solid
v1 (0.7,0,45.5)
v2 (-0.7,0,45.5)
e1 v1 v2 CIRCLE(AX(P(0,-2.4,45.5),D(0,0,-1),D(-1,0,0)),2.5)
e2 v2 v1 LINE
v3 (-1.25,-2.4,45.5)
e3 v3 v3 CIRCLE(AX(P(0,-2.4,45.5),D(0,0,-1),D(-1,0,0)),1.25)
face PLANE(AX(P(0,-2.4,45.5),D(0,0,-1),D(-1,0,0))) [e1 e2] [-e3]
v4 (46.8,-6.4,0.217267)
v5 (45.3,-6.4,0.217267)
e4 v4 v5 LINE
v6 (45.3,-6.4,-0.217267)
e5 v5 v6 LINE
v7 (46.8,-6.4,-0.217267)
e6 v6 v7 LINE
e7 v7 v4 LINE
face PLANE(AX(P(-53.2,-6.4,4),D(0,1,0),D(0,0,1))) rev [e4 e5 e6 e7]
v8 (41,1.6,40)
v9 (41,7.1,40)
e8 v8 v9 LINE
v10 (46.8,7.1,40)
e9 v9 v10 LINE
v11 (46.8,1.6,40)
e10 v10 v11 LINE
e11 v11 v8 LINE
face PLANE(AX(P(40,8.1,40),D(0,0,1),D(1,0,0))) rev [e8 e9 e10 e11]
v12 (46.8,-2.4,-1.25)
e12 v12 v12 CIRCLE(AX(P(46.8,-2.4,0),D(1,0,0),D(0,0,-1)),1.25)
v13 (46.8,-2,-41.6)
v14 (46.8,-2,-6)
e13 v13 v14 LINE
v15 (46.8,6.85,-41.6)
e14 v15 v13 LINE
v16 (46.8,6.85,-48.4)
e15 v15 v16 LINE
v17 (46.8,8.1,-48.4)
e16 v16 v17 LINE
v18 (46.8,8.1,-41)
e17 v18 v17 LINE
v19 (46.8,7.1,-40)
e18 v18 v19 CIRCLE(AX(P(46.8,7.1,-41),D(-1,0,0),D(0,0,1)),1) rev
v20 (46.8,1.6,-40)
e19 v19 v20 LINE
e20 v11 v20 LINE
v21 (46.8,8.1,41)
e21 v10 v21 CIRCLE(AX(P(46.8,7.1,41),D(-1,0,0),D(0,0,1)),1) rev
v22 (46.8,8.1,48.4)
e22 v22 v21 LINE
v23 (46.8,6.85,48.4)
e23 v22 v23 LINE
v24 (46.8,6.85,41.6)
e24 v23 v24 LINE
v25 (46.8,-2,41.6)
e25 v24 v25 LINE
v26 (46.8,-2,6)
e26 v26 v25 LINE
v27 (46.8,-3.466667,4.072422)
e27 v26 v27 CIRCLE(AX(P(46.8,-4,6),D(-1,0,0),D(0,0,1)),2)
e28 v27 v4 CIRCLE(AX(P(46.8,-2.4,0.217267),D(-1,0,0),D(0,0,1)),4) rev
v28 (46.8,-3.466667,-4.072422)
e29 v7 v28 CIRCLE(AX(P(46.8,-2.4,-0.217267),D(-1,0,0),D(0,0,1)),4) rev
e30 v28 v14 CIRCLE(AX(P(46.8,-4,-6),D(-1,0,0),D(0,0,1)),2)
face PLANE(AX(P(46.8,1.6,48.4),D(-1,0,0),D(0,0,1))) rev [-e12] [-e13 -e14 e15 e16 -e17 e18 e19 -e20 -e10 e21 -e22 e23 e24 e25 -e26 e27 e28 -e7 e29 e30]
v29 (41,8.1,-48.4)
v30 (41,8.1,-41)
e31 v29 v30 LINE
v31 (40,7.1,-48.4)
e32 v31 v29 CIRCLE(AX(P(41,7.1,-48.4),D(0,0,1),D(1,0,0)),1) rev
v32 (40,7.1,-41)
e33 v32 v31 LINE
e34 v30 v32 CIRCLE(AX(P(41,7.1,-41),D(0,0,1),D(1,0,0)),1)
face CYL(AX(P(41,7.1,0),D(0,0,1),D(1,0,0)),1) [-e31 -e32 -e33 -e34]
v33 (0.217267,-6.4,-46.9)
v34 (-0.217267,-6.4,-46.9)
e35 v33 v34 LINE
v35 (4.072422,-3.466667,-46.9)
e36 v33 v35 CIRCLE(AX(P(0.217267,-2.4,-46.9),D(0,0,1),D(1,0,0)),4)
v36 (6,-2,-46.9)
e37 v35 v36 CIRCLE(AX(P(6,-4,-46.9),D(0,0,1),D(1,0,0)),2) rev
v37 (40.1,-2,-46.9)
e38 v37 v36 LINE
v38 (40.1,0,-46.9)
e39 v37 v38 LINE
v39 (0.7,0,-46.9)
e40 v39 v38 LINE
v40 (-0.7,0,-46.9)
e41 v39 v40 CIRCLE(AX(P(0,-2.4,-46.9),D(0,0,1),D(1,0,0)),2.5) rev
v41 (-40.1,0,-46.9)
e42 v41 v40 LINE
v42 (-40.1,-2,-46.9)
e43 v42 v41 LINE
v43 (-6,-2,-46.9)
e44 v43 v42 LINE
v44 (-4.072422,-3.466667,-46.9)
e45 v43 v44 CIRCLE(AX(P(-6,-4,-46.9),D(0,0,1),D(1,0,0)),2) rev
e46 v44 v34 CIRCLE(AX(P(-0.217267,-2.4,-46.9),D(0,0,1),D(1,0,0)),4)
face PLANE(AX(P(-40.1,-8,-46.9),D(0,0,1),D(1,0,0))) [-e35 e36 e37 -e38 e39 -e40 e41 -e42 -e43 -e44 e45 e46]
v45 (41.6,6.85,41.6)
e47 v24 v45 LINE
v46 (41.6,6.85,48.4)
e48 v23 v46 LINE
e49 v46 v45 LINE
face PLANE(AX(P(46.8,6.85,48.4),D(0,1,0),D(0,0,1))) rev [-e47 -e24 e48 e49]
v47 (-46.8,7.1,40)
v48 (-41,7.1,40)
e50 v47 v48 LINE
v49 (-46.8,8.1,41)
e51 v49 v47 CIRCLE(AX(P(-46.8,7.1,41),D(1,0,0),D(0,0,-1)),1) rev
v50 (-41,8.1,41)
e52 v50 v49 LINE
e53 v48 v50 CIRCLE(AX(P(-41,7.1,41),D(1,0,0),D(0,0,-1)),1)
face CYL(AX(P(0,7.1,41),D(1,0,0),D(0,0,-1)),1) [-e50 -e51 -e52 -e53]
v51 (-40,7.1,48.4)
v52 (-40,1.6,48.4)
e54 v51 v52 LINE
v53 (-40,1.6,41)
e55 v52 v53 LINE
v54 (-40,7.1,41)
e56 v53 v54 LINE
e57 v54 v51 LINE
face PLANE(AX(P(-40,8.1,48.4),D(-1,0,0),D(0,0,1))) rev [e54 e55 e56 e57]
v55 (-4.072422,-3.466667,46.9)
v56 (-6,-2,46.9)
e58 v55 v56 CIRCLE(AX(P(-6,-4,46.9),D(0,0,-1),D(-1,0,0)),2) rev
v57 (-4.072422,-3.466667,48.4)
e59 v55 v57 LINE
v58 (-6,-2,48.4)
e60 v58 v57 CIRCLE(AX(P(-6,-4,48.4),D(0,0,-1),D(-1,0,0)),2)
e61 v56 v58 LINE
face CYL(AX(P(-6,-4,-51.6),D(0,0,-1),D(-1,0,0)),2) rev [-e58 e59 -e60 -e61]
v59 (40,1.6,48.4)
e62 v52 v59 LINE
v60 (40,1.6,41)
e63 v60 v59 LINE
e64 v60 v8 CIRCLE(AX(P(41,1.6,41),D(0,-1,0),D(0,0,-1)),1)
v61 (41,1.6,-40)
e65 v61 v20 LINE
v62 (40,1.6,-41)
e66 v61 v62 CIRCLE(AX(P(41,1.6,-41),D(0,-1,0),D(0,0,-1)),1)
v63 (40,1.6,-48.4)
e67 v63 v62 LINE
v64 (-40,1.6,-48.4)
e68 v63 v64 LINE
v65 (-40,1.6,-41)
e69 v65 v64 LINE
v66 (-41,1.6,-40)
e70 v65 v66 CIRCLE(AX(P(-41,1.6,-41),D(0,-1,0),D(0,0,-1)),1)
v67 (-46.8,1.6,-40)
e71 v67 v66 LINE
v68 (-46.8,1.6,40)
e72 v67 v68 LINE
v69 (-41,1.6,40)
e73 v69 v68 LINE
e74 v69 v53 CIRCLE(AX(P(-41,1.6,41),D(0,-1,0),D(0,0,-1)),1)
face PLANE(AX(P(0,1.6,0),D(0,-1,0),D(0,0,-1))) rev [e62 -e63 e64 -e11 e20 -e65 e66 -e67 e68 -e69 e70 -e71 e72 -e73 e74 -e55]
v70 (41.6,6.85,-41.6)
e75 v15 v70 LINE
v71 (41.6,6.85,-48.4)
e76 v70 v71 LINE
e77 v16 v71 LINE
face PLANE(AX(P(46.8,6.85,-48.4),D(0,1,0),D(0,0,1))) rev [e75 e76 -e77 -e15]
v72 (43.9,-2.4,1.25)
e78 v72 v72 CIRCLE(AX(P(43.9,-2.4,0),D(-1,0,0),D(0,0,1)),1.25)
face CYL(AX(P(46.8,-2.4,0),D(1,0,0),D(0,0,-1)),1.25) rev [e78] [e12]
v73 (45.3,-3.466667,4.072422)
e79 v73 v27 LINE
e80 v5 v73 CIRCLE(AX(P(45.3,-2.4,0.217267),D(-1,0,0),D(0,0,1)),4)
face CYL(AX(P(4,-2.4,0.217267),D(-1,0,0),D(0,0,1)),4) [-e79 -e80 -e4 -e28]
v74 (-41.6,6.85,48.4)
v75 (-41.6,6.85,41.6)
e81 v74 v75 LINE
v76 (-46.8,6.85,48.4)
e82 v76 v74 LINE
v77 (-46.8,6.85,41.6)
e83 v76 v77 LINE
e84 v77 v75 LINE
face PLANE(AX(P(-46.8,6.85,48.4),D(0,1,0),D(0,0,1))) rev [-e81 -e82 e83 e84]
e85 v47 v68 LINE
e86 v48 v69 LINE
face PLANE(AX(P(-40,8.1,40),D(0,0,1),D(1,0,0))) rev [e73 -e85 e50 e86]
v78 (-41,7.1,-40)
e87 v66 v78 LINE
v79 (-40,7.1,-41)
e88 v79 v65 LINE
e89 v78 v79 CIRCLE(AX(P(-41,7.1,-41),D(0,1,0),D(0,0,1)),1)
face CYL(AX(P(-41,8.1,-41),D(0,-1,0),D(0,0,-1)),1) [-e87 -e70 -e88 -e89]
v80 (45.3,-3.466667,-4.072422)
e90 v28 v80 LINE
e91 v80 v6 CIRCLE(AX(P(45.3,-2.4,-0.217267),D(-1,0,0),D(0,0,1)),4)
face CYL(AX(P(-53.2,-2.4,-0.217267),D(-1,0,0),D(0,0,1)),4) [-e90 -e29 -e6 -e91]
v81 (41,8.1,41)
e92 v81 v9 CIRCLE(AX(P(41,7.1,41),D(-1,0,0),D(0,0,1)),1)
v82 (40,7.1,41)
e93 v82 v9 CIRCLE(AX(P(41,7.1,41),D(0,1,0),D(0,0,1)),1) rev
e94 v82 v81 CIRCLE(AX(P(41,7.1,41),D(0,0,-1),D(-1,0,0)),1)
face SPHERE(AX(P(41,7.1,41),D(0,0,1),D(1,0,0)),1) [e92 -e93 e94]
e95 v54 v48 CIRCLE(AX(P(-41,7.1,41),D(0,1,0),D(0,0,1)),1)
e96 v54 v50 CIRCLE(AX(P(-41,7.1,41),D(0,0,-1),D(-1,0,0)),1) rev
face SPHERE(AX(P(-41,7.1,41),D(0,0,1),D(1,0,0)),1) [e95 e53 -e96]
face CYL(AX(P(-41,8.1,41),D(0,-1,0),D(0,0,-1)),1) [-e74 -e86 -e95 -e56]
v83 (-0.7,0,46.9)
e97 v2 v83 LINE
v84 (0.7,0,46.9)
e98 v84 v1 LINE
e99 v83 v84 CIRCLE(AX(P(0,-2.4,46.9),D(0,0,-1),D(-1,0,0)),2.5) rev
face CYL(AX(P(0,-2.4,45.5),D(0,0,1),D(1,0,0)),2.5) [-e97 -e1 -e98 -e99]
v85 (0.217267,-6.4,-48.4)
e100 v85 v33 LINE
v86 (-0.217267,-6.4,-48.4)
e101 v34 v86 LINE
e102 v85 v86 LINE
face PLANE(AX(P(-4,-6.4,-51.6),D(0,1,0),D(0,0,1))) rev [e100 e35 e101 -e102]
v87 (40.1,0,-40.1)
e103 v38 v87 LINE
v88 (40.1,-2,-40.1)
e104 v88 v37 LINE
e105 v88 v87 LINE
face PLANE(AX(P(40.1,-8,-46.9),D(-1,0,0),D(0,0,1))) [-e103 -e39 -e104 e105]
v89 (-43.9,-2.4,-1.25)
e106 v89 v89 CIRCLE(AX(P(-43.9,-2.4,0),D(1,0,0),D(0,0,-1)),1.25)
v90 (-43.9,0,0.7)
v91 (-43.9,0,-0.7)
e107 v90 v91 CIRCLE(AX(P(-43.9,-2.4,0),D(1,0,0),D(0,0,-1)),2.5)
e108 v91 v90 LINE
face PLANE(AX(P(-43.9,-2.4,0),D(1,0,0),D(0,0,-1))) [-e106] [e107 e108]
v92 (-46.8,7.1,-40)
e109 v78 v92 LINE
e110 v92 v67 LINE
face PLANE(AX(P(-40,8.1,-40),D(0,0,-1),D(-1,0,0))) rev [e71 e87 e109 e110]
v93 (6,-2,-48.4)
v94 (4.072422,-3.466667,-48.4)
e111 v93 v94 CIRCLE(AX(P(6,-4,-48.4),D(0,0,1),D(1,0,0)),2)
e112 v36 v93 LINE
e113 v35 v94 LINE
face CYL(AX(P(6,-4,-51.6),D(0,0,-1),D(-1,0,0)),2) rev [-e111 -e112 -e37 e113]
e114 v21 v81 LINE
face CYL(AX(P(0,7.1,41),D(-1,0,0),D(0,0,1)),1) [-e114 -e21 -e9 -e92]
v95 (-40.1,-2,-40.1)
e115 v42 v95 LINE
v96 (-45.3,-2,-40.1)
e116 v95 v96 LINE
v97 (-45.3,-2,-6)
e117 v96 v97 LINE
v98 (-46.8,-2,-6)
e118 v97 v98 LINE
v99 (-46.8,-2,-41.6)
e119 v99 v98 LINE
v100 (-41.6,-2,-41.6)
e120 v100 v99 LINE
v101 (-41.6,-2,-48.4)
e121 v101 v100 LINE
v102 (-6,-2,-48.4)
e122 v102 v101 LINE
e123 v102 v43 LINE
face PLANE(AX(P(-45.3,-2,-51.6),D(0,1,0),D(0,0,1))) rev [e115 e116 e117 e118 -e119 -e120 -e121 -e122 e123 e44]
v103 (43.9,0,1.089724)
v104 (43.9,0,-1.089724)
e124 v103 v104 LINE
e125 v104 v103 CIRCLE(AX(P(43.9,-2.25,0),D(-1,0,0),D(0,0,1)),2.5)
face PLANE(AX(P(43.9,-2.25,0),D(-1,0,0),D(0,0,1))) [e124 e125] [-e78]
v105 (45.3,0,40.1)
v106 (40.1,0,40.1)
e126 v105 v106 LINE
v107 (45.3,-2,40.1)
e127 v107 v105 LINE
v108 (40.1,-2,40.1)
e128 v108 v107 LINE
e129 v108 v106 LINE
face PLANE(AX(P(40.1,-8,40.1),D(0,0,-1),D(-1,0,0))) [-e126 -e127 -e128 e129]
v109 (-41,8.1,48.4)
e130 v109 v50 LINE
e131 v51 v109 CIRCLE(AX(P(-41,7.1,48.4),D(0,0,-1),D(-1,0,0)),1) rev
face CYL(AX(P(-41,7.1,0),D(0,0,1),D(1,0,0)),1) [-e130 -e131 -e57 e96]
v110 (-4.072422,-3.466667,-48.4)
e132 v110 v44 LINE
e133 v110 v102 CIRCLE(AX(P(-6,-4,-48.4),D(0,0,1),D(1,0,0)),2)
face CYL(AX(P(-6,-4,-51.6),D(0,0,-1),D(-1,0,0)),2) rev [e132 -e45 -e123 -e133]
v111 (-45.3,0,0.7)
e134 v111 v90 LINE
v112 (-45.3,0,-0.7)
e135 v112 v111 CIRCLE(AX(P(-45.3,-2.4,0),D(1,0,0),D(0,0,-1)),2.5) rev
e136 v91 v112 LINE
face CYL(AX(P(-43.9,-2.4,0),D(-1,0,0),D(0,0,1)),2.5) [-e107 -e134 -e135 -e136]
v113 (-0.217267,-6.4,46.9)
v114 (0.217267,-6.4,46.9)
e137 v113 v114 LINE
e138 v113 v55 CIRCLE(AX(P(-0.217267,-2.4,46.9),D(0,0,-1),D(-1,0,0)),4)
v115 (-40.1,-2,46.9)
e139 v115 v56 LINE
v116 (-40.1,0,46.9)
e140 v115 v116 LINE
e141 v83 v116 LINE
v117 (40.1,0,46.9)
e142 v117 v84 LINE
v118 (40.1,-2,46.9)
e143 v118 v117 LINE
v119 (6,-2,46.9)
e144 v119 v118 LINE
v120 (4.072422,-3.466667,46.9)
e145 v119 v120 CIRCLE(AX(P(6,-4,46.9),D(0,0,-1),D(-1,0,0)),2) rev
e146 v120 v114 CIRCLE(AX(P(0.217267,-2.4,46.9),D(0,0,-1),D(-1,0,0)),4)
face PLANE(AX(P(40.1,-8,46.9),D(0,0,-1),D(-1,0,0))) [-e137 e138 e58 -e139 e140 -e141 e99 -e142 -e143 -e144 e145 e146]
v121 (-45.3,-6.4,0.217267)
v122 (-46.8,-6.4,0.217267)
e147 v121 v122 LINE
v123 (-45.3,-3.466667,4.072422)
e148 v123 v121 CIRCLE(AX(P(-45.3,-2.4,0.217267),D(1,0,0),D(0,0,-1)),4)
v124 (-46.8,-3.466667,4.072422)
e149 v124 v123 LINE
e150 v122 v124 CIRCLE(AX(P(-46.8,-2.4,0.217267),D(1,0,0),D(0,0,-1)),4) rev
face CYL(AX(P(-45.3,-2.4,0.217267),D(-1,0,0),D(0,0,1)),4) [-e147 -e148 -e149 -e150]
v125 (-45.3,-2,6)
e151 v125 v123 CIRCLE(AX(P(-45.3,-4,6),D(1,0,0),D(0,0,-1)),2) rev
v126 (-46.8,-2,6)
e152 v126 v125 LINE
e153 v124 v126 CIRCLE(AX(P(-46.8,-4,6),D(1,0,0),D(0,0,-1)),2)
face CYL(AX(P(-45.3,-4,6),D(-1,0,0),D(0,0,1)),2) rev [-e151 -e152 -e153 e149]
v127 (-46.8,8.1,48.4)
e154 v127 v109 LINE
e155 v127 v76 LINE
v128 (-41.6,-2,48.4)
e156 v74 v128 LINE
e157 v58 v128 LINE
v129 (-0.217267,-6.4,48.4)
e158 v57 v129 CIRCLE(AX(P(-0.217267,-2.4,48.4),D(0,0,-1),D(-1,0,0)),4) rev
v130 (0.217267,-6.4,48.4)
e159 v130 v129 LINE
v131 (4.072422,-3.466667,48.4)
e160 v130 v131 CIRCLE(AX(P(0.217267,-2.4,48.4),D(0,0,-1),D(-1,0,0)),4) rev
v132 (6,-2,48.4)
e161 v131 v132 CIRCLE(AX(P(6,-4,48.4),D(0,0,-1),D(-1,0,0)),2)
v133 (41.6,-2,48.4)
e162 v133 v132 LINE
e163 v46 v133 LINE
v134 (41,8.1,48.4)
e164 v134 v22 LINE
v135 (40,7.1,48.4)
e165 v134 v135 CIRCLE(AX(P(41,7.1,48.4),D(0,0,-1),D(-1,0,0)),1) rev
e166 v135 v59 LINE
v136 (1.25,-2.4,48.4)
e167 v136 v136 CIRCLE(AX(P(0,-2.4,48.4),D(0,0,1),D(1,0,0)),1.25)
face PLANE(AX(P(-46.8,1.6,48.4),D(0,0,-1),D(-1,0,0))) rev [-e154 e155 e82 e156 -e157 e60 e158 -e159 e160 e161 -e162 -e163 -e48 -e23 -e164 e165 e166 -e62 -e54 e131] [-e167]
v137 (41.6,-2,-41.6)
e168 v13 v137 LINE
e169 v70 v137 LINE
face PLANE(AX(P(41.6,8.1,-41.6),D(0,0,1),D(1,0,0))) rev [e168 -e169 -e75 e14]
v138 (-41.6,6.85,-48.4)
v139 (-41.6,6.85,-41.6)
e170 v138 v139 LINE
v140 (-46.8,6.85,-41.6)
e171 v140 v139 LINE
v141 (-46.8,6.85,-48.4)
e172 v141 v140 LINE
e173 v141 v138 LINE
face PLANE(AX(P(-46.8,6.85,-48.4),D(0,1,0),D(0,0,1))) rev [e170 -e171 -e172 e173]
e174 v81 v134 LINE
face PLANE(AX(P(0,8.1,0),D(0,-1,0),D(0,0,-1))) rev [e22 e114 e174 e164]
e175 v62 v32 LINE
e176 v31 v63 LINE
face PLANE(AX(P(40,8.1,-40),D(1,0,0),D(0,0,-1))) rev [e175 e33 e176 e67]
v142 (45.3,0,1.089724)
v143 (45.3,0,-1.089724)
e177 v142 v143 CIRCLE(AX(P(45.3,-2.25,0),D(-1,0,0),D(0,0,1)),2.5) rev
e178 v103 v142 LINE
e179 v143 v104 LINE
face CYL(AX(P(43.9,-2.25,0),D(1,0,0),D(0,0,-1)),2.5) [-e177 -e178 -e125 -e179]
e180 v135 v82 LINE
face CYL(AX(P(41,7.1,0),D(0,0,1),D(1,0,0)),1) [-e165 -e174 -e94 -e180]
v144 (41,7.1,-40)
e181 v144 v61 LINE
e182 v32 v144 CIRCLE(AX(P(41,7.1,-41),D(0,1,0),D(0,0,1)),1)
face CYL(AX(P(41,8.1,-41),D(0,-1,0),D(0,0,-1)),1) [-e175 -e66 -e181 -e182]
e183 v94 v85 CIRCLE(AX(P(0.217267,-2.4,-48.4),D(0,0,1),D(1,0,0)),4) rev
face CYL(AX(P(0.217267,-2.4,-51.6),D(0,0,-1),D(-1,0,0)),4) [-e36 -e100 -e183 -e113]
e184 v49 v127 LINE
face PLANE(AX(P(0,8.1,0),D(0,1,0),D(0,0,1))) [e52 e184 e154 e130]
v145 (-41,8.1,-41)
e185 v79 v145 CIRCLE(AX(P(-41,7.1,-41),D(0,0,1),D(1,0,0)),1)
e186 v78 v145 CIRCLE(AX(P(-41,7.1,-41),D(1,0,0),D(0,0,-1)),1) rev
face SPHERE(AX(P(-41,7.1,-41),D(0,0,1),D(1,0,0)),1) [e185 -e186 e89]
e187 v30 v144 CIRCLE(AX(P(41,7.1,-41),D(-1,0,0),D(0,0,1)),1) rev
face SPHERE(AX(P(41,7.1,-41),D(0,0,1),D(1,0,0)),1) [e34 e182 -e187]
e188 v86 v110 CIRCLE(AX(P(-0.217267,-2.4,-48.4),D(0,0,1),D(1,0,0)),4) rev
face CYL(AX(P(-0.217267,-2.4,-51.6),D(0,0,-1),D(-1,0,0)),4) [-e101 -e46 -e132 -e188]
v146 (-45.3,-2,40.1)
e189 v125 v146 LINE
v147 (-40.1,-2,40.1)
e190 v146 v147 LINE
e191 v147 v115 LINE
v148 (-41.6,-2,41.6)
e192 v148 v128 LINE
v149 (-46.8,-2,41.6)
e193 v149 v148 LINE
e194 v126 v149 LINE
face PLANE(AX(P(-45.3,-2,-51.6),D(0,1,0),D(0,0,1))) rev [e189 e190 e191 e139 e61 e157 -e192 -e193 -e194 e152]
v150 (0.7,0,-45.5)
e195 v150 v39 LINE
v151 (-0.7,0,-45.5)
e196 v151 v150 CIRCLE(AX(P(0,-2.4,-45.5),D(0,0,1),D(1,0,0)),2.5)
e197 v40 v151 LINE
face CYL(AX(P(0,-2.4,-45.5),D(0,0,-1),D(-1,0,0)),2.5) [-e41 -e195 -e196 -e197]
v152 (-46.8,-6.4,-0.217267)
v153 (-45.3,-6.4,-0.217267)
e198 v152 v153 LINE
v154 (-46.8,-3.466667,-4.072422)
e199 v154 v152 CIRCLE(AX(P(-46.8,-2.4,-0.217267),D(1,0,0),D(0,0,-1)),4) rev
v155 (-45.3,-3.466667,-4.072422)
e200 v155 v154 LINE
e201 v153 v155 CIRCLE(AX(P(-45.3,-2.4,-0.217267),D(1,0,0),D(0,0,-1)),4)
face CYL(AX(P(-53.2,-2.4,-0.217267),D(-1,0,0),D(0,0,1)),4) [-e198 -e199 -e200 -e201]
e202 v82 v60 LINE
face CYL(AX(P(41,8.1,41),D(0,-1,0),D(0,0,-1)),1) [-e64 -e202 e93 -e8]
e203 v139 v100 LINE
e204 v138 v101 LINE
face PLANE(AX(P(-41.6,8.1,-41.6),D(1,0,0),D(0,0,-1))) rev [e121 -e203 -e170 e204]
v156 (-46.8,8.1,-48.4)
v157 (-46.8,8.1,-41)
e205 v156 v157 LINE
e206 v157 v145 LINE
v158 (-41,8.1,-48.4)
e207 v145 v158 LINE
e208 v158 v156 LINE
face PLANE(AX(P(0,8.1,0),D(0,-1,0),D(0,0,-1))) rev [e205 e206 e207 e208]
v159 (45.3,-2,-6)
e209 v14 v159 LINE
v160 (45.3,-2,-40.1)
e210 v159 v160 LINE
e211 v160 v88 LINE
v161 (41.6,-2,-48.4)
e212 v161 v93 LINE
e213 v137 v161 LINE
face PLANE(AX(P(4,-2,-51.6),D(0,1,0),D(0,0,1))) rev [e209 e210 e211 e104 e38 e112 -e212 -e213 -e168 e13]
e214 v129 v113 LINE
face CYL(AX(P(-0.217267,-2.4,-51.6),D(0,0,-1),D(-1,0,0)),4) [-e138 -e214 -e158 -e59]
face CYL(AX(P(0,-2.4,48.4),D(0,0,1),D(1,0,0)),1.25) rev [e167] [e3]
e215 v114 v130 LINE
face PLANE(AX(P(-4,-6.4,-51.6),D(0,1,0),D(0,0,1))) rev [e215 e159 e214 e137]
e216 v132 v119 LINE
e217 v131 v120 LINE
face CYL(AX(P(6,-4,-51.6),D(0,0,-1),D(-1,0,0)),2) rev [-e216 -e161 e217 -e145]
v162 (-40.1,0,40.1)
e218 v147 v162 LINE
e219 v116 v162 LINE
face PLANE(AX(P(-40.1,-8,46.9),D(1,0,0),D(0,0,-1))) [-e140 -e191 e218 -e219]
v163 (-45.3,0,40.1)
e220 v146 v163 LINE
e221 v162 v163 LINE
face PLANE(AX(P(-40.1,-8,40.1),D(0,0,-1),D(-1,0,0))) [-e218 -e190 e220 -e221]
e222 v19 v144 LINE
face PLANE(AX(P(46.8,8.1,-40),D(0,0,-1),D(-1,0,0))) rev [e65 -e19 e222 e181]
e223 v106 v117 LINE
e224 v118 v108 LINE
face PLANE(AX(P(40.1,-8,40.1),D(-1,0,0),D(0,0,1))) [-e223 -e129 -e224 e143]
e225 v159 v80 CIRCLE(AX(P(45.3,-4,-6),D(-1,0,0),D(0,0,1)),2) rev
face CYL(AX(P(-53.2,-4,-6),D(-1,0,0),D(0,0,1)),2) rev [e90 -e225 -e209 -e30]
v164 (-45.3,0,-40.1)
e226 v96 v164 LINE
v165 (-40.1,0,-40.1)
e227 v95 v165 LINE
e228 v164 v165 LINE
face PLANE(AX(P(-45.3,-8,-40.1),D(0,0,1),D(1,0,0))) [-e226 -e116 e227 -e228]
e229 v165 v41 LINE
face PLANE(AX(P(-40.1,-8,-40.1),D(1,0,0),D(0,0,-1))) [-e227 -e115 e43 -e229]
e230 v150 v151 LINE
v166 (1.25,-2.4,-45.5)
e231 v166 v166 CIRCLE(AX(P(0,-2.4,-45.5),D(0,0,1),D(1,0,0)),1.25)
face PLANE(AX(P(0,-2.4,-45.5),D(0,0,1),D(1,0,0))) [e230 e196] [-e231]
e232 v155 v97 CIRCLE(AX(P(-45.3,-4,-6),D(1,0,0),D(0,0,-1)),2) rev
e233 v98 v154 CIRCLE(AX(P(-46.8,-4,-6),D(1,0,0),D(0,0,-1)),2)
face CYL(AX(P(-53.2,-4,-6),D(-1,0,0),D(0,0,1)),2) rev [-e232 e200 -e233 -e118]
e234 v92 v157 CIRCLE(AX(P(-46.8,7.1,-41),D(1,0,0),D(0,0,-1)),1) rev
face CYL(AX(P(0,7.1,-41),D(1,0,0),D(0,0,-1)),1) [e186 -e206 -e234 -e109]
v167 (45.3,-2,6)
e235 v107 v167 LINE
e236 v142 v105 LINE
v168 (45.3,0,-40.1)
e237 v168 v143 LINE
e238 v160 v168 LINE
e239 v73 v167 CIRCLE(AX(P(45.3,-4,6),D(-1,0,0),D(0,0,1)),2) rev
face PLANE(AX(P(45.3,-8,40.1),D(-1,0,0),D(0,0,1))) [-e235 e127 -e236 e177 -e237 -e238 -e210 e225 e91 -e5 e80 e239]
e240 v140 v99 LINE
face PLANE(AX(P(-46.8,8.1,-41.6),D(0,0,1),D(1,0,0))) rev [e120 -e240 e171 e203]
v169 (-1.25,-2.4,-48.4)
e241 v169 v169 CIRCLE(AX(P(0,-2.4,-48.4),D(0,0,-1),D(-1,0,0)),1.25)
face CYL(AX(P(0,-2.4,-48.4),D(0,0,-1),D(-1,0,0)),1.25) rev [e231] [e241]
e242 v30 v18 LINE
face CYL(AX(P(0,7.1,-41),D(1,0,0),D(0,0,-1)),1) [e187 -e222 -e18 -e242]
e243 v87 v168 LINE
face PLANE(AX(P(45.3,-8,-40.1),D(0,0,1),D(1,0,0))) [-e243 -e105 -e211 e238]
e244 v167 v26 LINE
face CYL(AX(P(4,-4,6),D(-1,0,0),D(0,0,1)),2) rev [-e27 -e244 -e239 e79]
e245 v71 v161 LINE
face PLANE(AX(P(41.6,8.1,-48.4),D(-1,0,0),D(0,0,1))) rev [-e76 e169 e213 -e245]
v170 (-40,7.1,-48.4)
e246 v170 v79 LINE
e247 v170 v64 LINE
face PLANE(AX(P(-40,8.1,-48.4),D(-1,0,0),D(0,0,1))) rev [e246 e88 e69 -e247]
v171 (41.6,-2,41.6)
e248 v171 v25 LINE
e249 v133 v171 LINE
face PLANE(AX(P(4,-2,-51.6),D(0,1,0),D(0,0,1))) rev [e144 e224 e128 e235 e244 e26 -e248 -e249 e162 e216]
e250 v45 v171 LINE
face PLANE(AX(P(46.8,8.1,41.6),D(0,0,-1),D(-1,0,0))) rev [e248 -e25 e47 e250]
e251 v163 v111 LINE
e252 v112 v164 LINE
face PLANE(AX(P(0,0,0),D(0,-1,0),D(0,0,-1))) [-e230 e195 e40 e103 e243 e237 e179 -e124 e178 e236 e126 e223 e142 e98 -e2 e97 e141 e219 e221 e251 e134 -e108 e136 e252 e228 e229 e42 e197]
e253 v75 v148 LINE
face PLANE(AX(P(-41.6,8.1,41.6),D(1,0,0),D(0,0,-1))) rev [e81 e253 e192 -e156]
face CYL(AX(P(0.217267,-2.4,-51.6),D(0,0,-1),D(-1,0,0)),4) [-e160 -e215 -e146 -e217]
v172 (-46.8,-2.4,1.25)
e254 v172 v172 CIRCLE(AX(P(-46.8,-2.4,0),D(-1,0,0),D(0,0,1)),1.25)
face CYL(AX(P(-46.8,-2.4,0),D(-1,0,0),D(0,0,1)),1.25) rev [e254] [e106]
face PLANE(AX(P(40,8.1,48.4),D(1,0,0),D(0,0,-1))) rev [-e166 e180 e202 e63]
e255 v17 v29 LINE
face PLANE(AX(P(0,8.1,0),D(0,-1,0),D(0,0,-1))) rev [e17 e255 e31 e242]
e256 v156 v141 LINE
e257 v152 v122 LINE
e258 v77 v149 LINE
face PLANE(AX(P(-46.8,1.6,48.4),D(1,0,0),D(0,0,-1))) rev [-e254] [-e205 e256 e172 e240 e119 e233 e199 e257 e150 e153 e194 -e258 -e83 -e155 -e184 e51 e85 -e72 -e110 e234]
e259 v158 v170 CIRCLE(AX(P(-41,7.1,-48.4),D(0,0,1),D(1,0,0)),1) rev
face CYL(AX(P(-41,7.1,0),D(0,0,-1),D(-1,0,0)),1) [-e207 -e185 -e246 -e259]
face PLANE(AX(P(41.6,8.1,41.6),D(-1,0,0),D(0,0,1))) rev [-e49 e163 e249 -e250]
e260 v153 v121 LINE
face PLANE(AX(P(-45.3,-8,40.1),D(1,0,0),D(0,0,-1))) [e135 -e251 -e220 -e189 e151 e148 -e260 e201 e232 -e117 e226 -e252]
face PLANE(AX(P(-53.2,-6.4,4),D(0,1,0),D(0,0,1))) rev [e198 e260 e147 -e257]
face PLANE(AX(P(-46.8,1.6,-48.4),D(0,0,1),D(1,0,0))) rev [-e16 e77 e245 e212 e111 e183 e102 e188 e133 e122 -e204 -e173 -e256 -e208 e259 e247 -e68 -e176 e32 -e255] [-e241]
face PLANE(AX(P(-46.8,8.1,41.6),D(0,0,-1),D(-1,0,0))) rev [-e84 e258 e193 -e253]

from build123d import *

# Parameters (mm, degrees)
SKETCH2_W                 = 93.6
SKETCH2_H                 = 96.8
BOSS_EXTRUDE2_DEPTH       = 1.6
CUT_EXTRUDE1_DEPTH        = 1.6
CUT_EXTRUDE2_DEPTH        = 1.6
CUT_EXTRUDE3_DEPTH        = 1.6
CUT_EXTRUDE4_DEPTH        = 1.6
SKETCH7_R                 = 15
BOSS_EXTRUDE3_DEPTH       = 1.6
SKETCH8_R                 = 6
CUT_EXTRUDE5_DEPTH        = 1.6
FILLET1_R                 = 2
FILLET2_R                 = 2
SKETCH17_W                = 43.6
SKETCH17_H                = 1.6
BOSS_EXTRUDE4_DEPTH       = 8
CUT_EXTRUDE14_DEPTH       = 1.6
CUT_EXTRUDE15_DEPTH       = 1.6
SKETCH21_W                = 1.6
SKETCH21_H                = 43.6
BOSS_EXTRUDE5_DEPTH       = 8
SKETCH22_W                = 1.6
SKETCH22_H                = 43.6
BOSS_EXTRUDE6_DEPTH       = 8
SKETCH23_W                = 43.6
SKETCH23_H                = 1.6
BOSS_EXTRUDE7_DEPTH       = 8
CUT_EXTRUDE16_DEPTH       = 100
CUT_EXTRUDE17_DEPTH       = 100
CUT_EXTRUDE18_DEPTH       = 100
CUT_EXTRUDE19_DEPTH       = 100
SKETCH28_R                = 2.5
BOSS_EXTRUDE8_DEPTH       = 1.4
BOSS_EXTRUDE9_START       = 1.4
SKETCH29_R                = 2.5
BOSS_EXTRUDE9_DEPTH       = 1.4
SKETCH30_R                = 2.5
BOSS_EXTRUDE10_DEPTH      = 1.4
BOSS_EXTRUDE11_START      = 1.4
SKETCH31_R                = 2.5
BOSS_EXTRUDE11_DEPTH      = 1.4
M3X0_5_TAPPED_HOLE1_D     = 2.5
M3X0_5_TAPPED_HOLE2_D     = 2.5
M3X0_5_TAPPED_HOLE2_DEPTH = 8.5
M3X0_5_TAPPED_HOLE2_TIP   = 0.751075774
M3X0_5_TAPPED_HOLE3_D     = 2.5
M3X0_5_TAPPED_HOLE3_DEPTH = 8.5
M3X0_5_TAPPED_HOLE3_TIP   = 0.751075774
FILLET5_R                 = 5
FILLET6_R                 = 5
FILLET7_R                 = 5
SKETCH39_W                = 50
SKETCH39_H                = 2
CUT_EXTRUDE20_DEPTH       = 100
SKETCH40_W                = 50
SKETCH40_H                = 2
CUT_EXTRUDE21_DEPTH       = 100
FILLET10_R                = 5
FILLET11_R                = 5
BOSS_EXTRUDE12_DEPTH      = 6.5
FILLET12_R                = 1
BOSS_EXTRUDE13_DEPTH      = 6.5
FILLET13_R                = 1
BOSS_EXTRUDE14_DEPTH      = 6.5
BOSS_EXTRUDE15_DEPTH      = 6.5
FILLET14_R                = 1
SKETCH46_W                = 10
SKETCH46_H                = 6
CUT_EXTRUDE23_DEPTH       = 100
SKETCH47_W                = 10
SKETCH47_H                = 6
CUT_EXTRUDE24_DEPTH       = 100
SKETCH48_W                = 10
SKETCH48_H                = 6
CUT_EXTRUDE25_DEPTH       = 100
SKETCH49_W                = 10
SKETCH49_H                = 6
CUT_EXTRUDE26_DEPTH       = 100
CHAMFER1_SIZE             = 5
FILLET15_R                = 5
FILLET16_R                = 5
FILLET17_R                = 5
SKETCH51_W                = 6.8
SKETCH51_H                = 1.25
BOSS_EXTRUDE16_DEPTH      = 5.2
SKETCH52_W                = 6.8
SKETCH52_H                = 1.25
BOSS_EXTRUDE17_DEPTH      = 5.2
SKETCH53_W                = 5.2
SKETCH53_H                = 1.25
BOSS_EXTRUDE18_DEPTH      = 6.8
SKETCH54_W                = 6.8
SKETCH54_H                = 1.25
BOSS_EXTRUDE19_DEPTH      = 5.2
SKETCH55_W                = 5.452266971
SKETCH55_H                = 7.312215573
CUT_EXTRUDE27_DEPTH       = 1.6
SKETCH56_W                = 7.42696381
SKETCH56_H                = 8.768462259
CUT_EXTRUDE28_DEPTH       = 1.6
SKETCH57_W                = 6.622712937
SKETCH57_H                = 11.132324922
CUT_EXTRUDE29_DEPTH       = 1.6
SKETCH58_W                = 8.920588643
SKETCH58_H                = 11.870937258
CUT_EXTRUDE30_DEPTH       = 1.6
SKETCH60_W                = 93.6
SKETCH60_H                = 6
CUT_EXTRUDE31_DEPTH       = 100
BOSS_EXTRUDE20_DEPTH      = 8
SKETCH64_W                = 41.3
SKETCH64_H                = 6
CUT_EXTRUDE32_DEPTH       = 100
SKETCH65_W                = 41.3
SKETCH65_H                = 6
CUT_EXTRUDE33_DEPTH       = 100
SKETCH66_W                = 37.6
SKETCH66_H                = 6
CUT_EXTRUDE34_DEPTH       = 100
SKETCH68_W                = 37.6
SKETCH68_H                = 6
CUT_EXTRUDE35_DEPTH       = 100
FILLET19_R                = 2
SKETCH73_R                = 2.5
BOSS_EXTRUDE21_DEPTH      = 1.4
SKETCH74_R                = 2.5
BOSS_EXTRUDE22_DEPTH      = 1.4
BOSS_EXTRUDE23_START      = 1.4
SKETCH75_R                = 2.5
BOSS_EXTRUDE23_DEPTH      = 1.4
SKETCH76_R                = 2.5
BOSS_EXTRUDE24_DEPTH      = 1.4
SKETCH77_W                = 8
SKETCH77_H                = 1.6
CUT_EXTRUDE40_DEPTH       = 100
SKETCH79_W                = 8
SKETCH79_H                = 1.6
CUT_EXTRUDE41_DEPTH       = 100
FILLET20_R                = 4
M3X0_5_TAPPED_HOLE4_D     = 2.5
M3X0_5_TAPPED_HOLE4_DEPTH = 8.5
M3X0_5_TAPPED_HOLE4_TIP   = 0.751075774
M3X0_5_TAPPED_HOLE5_D     = 2.5
M3X0_5_TAPPED_HOLE5_DEPTH = 8.5
M3X0_5_TAPPED_HOLE5_TIP   = 0.751075774
M3X0_5_TAPPED_HOLE6_D     = 2.5
M3X0_5_TAPPED_HOLE6_DEPTH = 8.5
M3X0_5_TAPPED_HOLE6_TIP   = 0.751075774
M3X0_5_TAPPED_HOLE7_D     = 2.5
M3X0_5_TAPPED_HOLE7_DEPTH = 8.5
M3X0_5_TAPPED_HOLE7_TIP   = 0.751075774
SKETCH88_W                = 75.688433258
SKETCH88_H                = 79.83223405
BOSS_EXTRUDE25_DEPTH      = 1.6


with BuildPart() as part:
    # Sketch2 → Boss-Extrude2 (new body)
    with BuildSketch(Plane(origin=(0, 0, 0), x_dir=(1, 0, 0), z_dir=(0, 1, 0))):
        Rectangle(SKETCH2_W, SKETCH2_H)
    extrude(amount=BOSS_EXTRUDE2_DEPTH)

    # Sketch3 → Cut-Extrude1 (cut)
    with BuildSketch(Plane(origin=(0, 1.6, 0), x_dir=(1, 0, 0), z_dir=(0, 1, 0))):
        Polygon((-30.175405763, 38.4), (30.175405763, 38.4), (0, 7.192956433), align=None)
    extrude(amount=-CUT_EXTRUDE1_DEPTH, mode=Mode.SUBTRACT)

    # Sketch4 → Cut-Extrude2 (cut)
    with BuildSketch(Plane(origin=(0, 1.6, 0), x_dir=(1, 0, 0), z_dir=(0, 1, 0))):
        Polygon((-30.175405763, -38.4), (30.175405763, -38.4), (0, -7.192956433), align=None)
    extrude(amount=-CUT_EXTRUDE2_DEPTH, mode=Mode.SUBTRACT)

    # Sketch5 → Cut-Extrude3 (cut)
    with BuildSketch(Plane(origin=(0, 1.6, 0), x_dir=(1, 0, 0), z_dir=(0, 1, 0))):
        Polygon((36.8, 30.865163225), (36.8, -30.865163225), (6.95517275, 0), align=None)
    extrude(amount=-CUT_EXTRUDE3_DEPTH, mode=Mode.SUBTRACT)

    # Sketch6 → Cut-Extrude4 (cut)
    with BuildSketch(Plane(origin=(0, 1.6, 0), x_dir=(1, 0, 0), z_dir=(0, 1, 0))):
        Polygon((-36.8, 30.865163225), (-36.8, -30.865163225), (-6.95517275, 0), align=None)
    extrude(amount=-CUT_EXTRUDE4_DEPTH, mode=Mode.SUBTRACT)

    # Sketch7 → Boss-Extrude3 (add)
    with BuildSketch(Plane(origin=(0, 1.6, 0), x_dir=(1, 0, 0), z_dir=(0, 1, 0))):
        Circle(SKETCH7_R)
    extrude(amount=-BOSS_EXTRUDE3_DEPTH)

    # Sketch8 → Cut-Extrude5 (cut)
    with BuildSketch(Plane(origin=(0, 1.6, 0), x_dir=(1, 0, 0), z_dir=(0, 1, 0))):
        with Locations(Location((0, 0, 0), (0, 0, 270))):
            Circle(SKETCH8_R)
    extrude(amount=-CUT_EXTRUDE5_DEPTH, mode=Mode.SUBTRACT)

    # Fillet1
    fillet1_edges = [part.edges().sort_by_distance(p)[0] for p in [
        (30.175405763, 0.8, -38.4),
        (-30.175405763, 0.8, -38.4),
        (-30.175405763, 0.8, 38.4),
        (30.175405763, 0.8, 38.4),
        (36.8, 0.8, -30.865163225),
        (36.8, 0.8, 30.865163225),
        (-36.8, 0.8, -30.865163225),
        (-36.8, 0.8, 30.865163225),
        (-13.424991499, 0.8, 6.691009135),
        (6.236097449, 0.8, -13.642253795),
        (13.424991499, 0.8, -6.691009135),
        (-6.236097449, 0.8, 13.642253795),
        (-6.236097449, 0.8, -13.642253795),
        (-13.424991499, 0.8, -6.691009135),
        (6.236097449, 0.8, 13.642253795),
        (13.424991499, 0.8, 6.691009135),
    ]]
    fillet(fillet1_edges, radius=FILLET1_R)

    # Fillet2
    fillet2_edges = [part.edges().sort_by_distance(p)[0] for p in [
        (46.8, 0.8, 48.4),
        (-46.8, 0.8, 48.4),
        (-46.8, 0.8, -48.4),
        (46.8, 0.8, -48.4),
    ]]
    fillet(fillet2_edges, radius=FILLET2_R)

    # Sketch17 → Boss-Extrude4 (add)
    with BuildSketch(Plane.XZ):
        with Locations((0, 47.6)):
            Rectangle(SKETCH17_W, SKETCH17_H)
    extrude(amount=BOSS_EXTRUDE4_DEPTH)

    # Sketch18 → Cut-Extrude14 (cut)
    with BuildSketch(Plane.XY.offset(48.4)):
        Polygon((-21.8, 0), (-21.8, -8), (-13.8, -8), align=None)
    extrude(amount=-CUT_EXTRUDE14_DEPTH, mode=Mode.SUBTRACT)

    # Sketch19 → Cut-Extrude15 (cut)
    with BuildSketch(Plane.XY.offset(48.4)):
        Polygon((21.8, 0), (21.8, -8), (13.8, -8), align=None)
    extrude(amount=-CUT_EXTRUDE15_DEPTH, mode=Mode.SUBTRACT)

    # Sketch21 → Boss-Extrude5 (add)
    with BuildSketch(Plane.XZ):
        with Locations((-46, 0)):
            Rectangle(SKETCH21_W, SKETCH21_H)
    extrude(amount=BOSS_EXTRUDE5_DEPTH)

    # Sketch22 → Boss-Extrude6 (add)
    with BuildSketch(Plane.XZ):
        with Locations((46, 0)):
            Rectangle(SKETCH22_W, SKETCH22_H)
    extrude(amount=BOSS_EXTRUDE6_DEPTH)

    # Sketch23 → Boss-Extrude7 (add)
    with BuildSketch(Plane.XZ):
        with Locations((0, -47.6)):
            Rectangle(SKETCH23_W, SKETCH23_H)
    extrude(amount=BOSS_EXTRUDE7_DEPTH)

    # Sketch24 → Cut-Extrude16 (cut)
    with BuildSketch(Plane(origin=(46.8, 0, 0), x_dir=(0, 0, -1), z_dir=(1, 0, 0))):
        Polygon((-21.8, 0), (-13.8, -8), (-21.8, -8), align=None)
    extrude(amount=-CUT_EXTRUDE16_DEPTH, mode=Mode.SUBTRACT)

    # Sketch25 → Cut-Extrude17 (cut)
    with BuildSketch(Plane(origin=(46.8, 0, 0), x_dir=(0, 0, -1), z_dir=(1, 0, 0))):
        Polygon((21.8, 0), (13.8, -8), (21.8, -8), align=None)
    extrude(amount=-CUT_EXTRUDE17_DEPTH, mode=Mode.SUBTRACT)

    # Sketch26 → Cut-Extrude18 (cut)
    with BuildSketch(Plane(origin=(0, 0, -48.4), x_dir=(-1, 0, 0), z_dir=(0, 0, -1))):
        Polygon((-21.8, 0), (-13.8, -8), (-21.8, -8), align=None)
    extrude(amount=-CUT_EXTRUDE18_DEPTH, mode=Mode.SUBTRACT)

    # Sketch27 → Cut-Extrude19 (cut)
    with BuildSketch(Plane(origin=(0, 0, -48.4), x_dir=(-1, 0, 0), z_dir=(0, 0, -1))):
        Polygon((21.8, 0), (13.8, -8), (21.8, -8), align=None)
    extrude(amount=-CUT_EXTRUDE19_DEPTH, mode=Mode.SUBTRACT)

    # Sketch28 → Boss-Extrude8 (add)
    with BuildSketch(Plane(origin=(-45.2, 0, 0), x_dir=(0, 0, -1), z_dir=(1, 0, 0))):
        with Locations((0, -2.4)):
            Circle(SKETCH28_R)
    extrude(amount=BOSS_EXTRUDE8_DEPTH)

    # Sketch29 → Boss-Extrude9 (add)
    with BuildSketch(Plane.ZY.offset(-45.2).offset(BOSS_EXTRUDE9_START)):
        with Locations((0, -2.4)):
            Circle(SKETCH29_R)
    extrude(amount=-BOSS_EXTRUDE9_DEPTH)

    # Sketch30 → Boss-Extrude10 (add)
    with BuildSketch(Plane.XY.offset(-46.8)):
        with Locations((0, -2.4)):
            Circle(SKETCH30_R)
    extrude(amount=BOSS_EXTRUDE10_DEPTH)

    # Sketch31 → Boss-Extrude11 (add)
    with BuildSketch(Plane(origin=(0, 0, 46.8), x_dir=(-1, 0, 0), z_dir=(0, 0, -1)).offset(BOSS_EXTRUDE11_START)):
        with Locations((0, -2.4)):
            Circle(SKETCH31_R)
    extrude(amount=-BOSS_EXTRUDE11_DEPTH)

    # M3x0.5 Tapped Hole1 (through all)
    with Locations(Plane.XY.offset(48.4)):
        with Locations((0, -2.4)):
            Hole(M3X0_5_TAPPED_HOLE1_D / 2)

    # M3x0.5 Tapped Hole2
    with Locations(Plane(origin=(46.8, 0, 0), x_dir=(0, 0, -1), z_dir=(1, 0, 0))):
        with Locations((0, -2.4)):
            Hole(M3X0_5_TAPPED_HOLE2_D / 2, depth=M3X0_5_TAPPED_HOLE2_DEPTH)
            with Locations((0, 0, -(M3X0_5_TAPPED_HOLE2_DEPTH + M3X0_5_TAPPED_HOLE2_TIP / 2))):  # 118° drill point
                Cone(0, M3X0_5_TAPPED_HOLE2_D / 2, M3X0_5_TAPPED_HOLE2_TIP, mode=Mode.SUBTRACT)

    # M3x0.5 Tapped Hole3
    with Locations(Plane.ZY.offset(46.8)):
        with Locations((0, -2.4)):
            Hole(M3X0_5_TAPPED_HOLE3_D / 2, depth=M3X0_5_TAPPED_HOLE3_DEPTH)
            with Locations((0, 0, -(M3X0_5_TAPPED_HOLE3_DEPTH + M3X0_5_TAPPED_HOLE3_TIP / 2))):  # 118° drill point
                Cone(0, M3X0_5_TAPPED_HOLE3_D / 2, M3X0_5_TAPPED_HOLE3_TIP, mode=Mode.SUBTRACT)

    # Fillet5
    fillet5_edges = [part.edges().sort_by_distance(p)[0] for p in [
        (13.8, -8, 47.6),
    ]]
    fillet(fillet5_edges, radius=FILLET5_R)

    # Fillet6
    fillet6_edges = [part.edges().sort_by_distance(p)[0] for p in [
        (-13.8, -8, 47.6),
    ]]
    fillet(fillet6_edges, radius=FILLET6_R)

    # Fillet7
    fillet7_edges = [part.edges().sort_by_distance(p)[0] for p in [
        (-46, -8, 13.8),
    ]]
    fillet(fillet7_edges, radius=FILLET7_R)

    # Sketch39 → Cut-Extrude20 (cut)
    with BuildSketch(Plane.XY.offset(48.4)):
        with Locations((0, -7)):
            Rectangle(SKETCH39_W, SKETCH39_H)
    extrude(amount=-CUT_EXTRUDE20_DEPTH, mode=Mode.SUBTRACT)

    # Sketch40 → Cut-Extrude21 (cut)
    with BuildSketch(Plane(origin=(46.8, 0, 0), x_dir=(0, 0, -1), z_dir=(1, 0, 0))):
        with Locations((0, -7)):
            Rectangle(SKETCH40_W, SKETCH40_H)
    extrude(amount=-CUT_EXTRUDE21_DEPTH, mode=Mode.SUBTRACT)

    # Fillet10
    fillet10_edges = [part.edges().sort_by_distance(p)[0] for p in [
        (46, -6, 15.8),
        (46, -6, -15.8),
    ]]
    fillet(fillet10_edges, radius=FILLET10_R)

    # Fillet11
    fillet11_edges = [part.edges().sort_by_distance(p)[0] for p in [
        (-15.8, -6, -47.6),
        (-15.8, -6, 47.6),
        (15.8, -6, 47.6),
        (15.8, -6, -47.6),
        (-46, -6, -15.8),
        (-46, -6, 15.8),
    ]]
    fillet(fillet11_edges, radius=FILLET11_R)

    # Sketch41 → Boss-Extrude12 (add)
    with BuildSketch(Plane(origin=(0, 1.6, 0), x_dir=(1, 0, 0), z_dir=(0, 1, 0))):
        Polygon((-46.8, 41.6), (-41.6, 41.6), (-41.6, 48.4), (-40, 48.4), (-40, 40), (-46.8, 40), align=None)
    extrude(amount=BOSS_EXTRUDE12_DEPTH)

    # Fillet12
    fillet12_edges = [part.edges().sort_by_distance(p)[0] for p in [
        (-40, 4.85, -40),
        (-43.4, 8.1, -40),
        (-40, 8.1, -44.2),
    ]]
    fillet(fillet12_edges, radius=FILLET12_R)

    # Sketch42 → Boss-Extrude13 (add)
    with BuildSketch(Plane(origin=(0, 1.6, 0), x_dir=(1, 0, 0), z_dir=(0, 1, 0))):
        Polygon((41.6, 48.4), (41.6, 41.6), (46.8, 41.6), (46.8, 40), (40, 40), (40, 48.4), align=None)
    extrude(amount=BOSS_EXTRUDE13_DEPTH)

    # Fillet13
    fillet13_edges = [part.edges().sort_by_distance(p)[0] for p in [
        (40, 4.85, -40),
        (40, 8.1, -44.2),
        (43.4, 8.1, -40),
    ]]
    fillet(fillet13_edges, radius=FILLET13_R)

    # Sketch43 → Boss-Extrude14 (add)
    with BuildSketch(Plane(origin=(0, 1.6, 0), x_dir=(1, 0, 0), z_dir=(0, 1, 0))):
        Polygon((-46.8, -41.6), (-41.6, -41.6), (-41.6, -48.4), (-40, -48.4), (-40, -40), (-46.8, -40), align=None)
    extrude(amount=BOSS_EXTRUDE14_DEPTH)

    # Sketch44 → Boss-Extrude15 (add)
    with BuildSketch(Plane(origin=(0, 1.6, 0), x_dir=(1, 0, 0), z_dir=(0, 1, 0))):
        Polygon((46.8, -41.6), (41.6, -41.6), (41.6, -48.4), (40, -48.4), (40, -40), (46.8, -40), align=None)
    extrude(amount=BOSS_EXTRUDE15_DEPTH)

    # Fillet14
    fillet14_edges = [part.edges().sort_by_distance(p)[0] for p in [
        (-40, 4.85, 40),
        (-40, 8.1, 44.2),
        (-43.4, 8.1, 40),
        (40, 4.85, 40),
        (43.4, 8.1, 40),
        (40, 8.1, 44.2),
    ]]
    fillet(fillet14_edges, radius=FILLET14_R)

    # Sketch46 → Cut-Extrude23 (cut)
    with BuildSketch(Plane.XY.offset(48.4)):
        with Locations((16.8, -3)):
            Rectangle(SKETCH46_W, SKETCH46_H)
    extrude(amount=-CUT_EXTRUDE23_DEPTH, mode=Mode.SUBTRACT)

    # Sketch47 → Cut-Extrude24 (cut)
    with BuildSketch(Plane.XY.offset(48.4)):
        with Locations((-16.8, -3)):
            Rectangle(SKETCH47_W, SKETCH47_H)
    extrude(amount=-CUT_EXTRUDE24_DEPTH, mode=Mode.SUBTRACT)

    # Sketch48 → Cut-Extrude25 (cut)
    with BuildSketch(Plane(origin=(46.8, 0, 0), x_dir=(0, 0, -1), z_dir=(1, 0, 0))):
        with Locations((-16.8, -3)):
            Rectangle(SKETCH48_W, SKETCH48_H)
    extrude(amount=-CUT_EXTRUDE25_DEPTH, mode=Mode.SUBTRACT)

    # Sketch49 → Cut-Extrude26 (cut)
    with BuildSketch(Plane(origin=(46.8, 0, 0), x_dir=(0, 0, -1), z_dir=(1, 0, 0))):
        with Locations((16.8, -3)):
            Rectangle(SKETCH49_W, SKETCH49_H)
    extrude(amount=-CUT_EXTRUDE26_DEPTH, mode=Mode.SUBTRACT)

    # Chamfer1
    chamfer1_edges = [part.edges().sort_by_distance(p)[0] for p in [
        (11.8, -6, 47.6),
        (11.8, -6, -47.6),
        (-11.8, -6, 47.6),
        (-11.8, -6, -47.6),
        (46, -6, 11.8),
        (-46, -6, 11.8),
        (46, -6, -11.8),
        (-46, -6, -11.8),
    ]]
    chamfer(chamfer1_edges, length=CHAMFER1_SIZE)

    # Fillet15
    # the kernel refuses this fillet: 5 mm, written as the material it adds along each edge
    with BuildSketch(Plane(origin=(46.8, 0, 11.8), x_dir=(0, -1, 0), z_dir=(-1, 0, 0))) as fillet15_piece_1:
        with BuildLine():
            CenterArc((5, 3), FILLET15_R, 180, 36.869897646)
            Line((0, 3), (0, 0))
            Line((0, 0), (1, 0))
        make_face()
    extrude(amount=1.6)

    # Fillet16
    # the kernel refuses this fillet: 5 mm, written as the material it adds along each edge
    with BuildSketch(Plane(origin=(11.8, 0, 48.4), x_dir=(0, -1, 0), z_dir=(0, 0, -1)), Plane(origin=(-45.2, 0, -11.8), x_dir=(0, -1, 0), z_dir=(-1, 0, 0)), Plane(origin=(11.8, 0, -46.8), x_dir=(0, -1, 0), z_dir=(0, 0, -1)), Plane(origin=(46.8, 0, -11.8), x_dir=(0, -1, 0), z_dir=(-1, 0, 0))) as fillet16_piece_1:
        with BuildLine():
            CenterArc((5, -3), FILLET16_R, 143.130102354, 36.869897646)
            Line((0, -3), (0, 0))
            Line((0, 0), (1, 0))
        make_face()
    extrude(amount=1.6)
    with BuildSketch(Plane(origin=(-11.8, 0, 48.4), x_dir=(0, -1, 0), z_dir=(0, 0, -1)), Plane(origin=(-45.2, 0, 11.8), x_dir=(0, -1, 0), z_dir=(-1, 0, 0)), Plane(origin=(-11.8, 0, -46.8), x_dir=(0, -1, 0), z_dir=(0, 0, -1))) as fillet16_piece_2:
        with BuildLine():
            CenterArc((5, 3), FILLET16_R, 180, 36.869897646)
            Line((0, 3), (0, 0))
            Line((0, 0), (1, 0))
        make_face()
    extrude(amount=1.6)

    # Fillet17
    fillet17_edges = [part.edges().sort_by_distance(p)[0] for p in [
        (46, -6, -6.8),
        (46, -6, 6.8),
        (6.8, -6, -47.6),
        (-6.8, -6, -47.6),
        (-46, -6, 6.8),
        (-46, -6, -6.8),
        (-6.8, -6, 47.6),
        (6.8, -6, 47.6),
    ]]
    fillet(fillet17_edges, radius=FILLET17_R)

    # Sketch51 → Boss-Extrude16 (add)
    with BuildSketch(Plane(origin=(41.6, 0, 0), x_dir=(0, 0, -1), z_dir=(1, 0, 0))):
        with Locations((-45, 7.475)):
            Rectangle(SKETCH51_W, SKETCH51_H)
    extrude(amount=BOSS_EXTRUDE16_DEPTH)

    # Sketch52 → Boss-Extrude17 (add)
    with BuildSketch(Plane(origin=(41.6, 0, 0), x_dir=(0, 0, -1), z_dir=(1, 0, 0))):
        with Locations((45, 7.475)):
            Rectangle(SKETCH52_W, SKETCH52_H)
    extrude(amount=BOSS_EXTRUDE17_DEPTH)

    # Sketch53 → Boss-Extrude18 (add)
    with BuildSketch(Plane.XY.offset(41.6)):
        with Locations((-44.2, 7.475)):
            Rectangle(SKETCH53_W, SKETCH53_H)
    extrude(amount=BOSS_EXTRUDE18_DEPTH)

    # Sketch54 → Boss-Extrude19 (add)
    with BuildSketch(Plane.ZY.offset(41.6)):
        with Locations((-45, 7.475)):
            Rectangle(SKETCH54_W, SKETCH54_H)
    extrude(amount=BOSS_EXTRUDE19_DEPTH)

    # Sketch55 → Cut-Extrude27 (cut)
    with BuildSketch(Plane(origin=(0, 1.6, 0), x_dir=(1, 0, 0), z_dir=(0, 1, 0))):
        with Locations((44.326133486, -45.256107787)):
            Rectangle(SKETCH55_W, SKETCH55_H)
    extrude(amount=-CUT_EXTRUDE27_DEPTH, mode=Mode.SUBTRACT)

    # Sketch56 → Cut-Extrude28 (cut)
    with BuildSketch(Plane(origin=(0, 1.6, 0), x_dir=(1, 0, 0), z_dir=(0, 1, 0))):
        with Locations((-45.313481905, -45.98423113)):
            Rectangle(SKETCH56_W, SKETCH56_H)
    extrude(amount=-CUT_EXTRUDE28_DEPTH, mode=Mode.SUBTRACT)

    # Sketch57 → Cut-Extrude29 (cut)
    with BuildSketch(Plane(origin=(0, 1.6, 0), x_dir=(1, 0, 0), z_dir=(0, 1, 0))):
        with Locations((44.911356469, 47.166162461)):
            Rectangle(SKETCH57_W, SKETCH57_H)
    extrude(amount=-CUT_EXTRUDE29_DEPTH, mode=Mode.SUBTRACT)

    # Sketch58 → Cut-Extrude30 (cut)
    with BuildSketch(Plane(origin=(0, 1.6, 0), x_dir=(1, 0, 0), z_dir=(0, 1, 0))):
        with Locations((-46.060294322, 47.535468629)):
            Rectangle(SKETCH58_W, SKETCH58_H)
    extrude(amount=-CUT_EXTRUDE30_DEPTH, mode=Mode.SUBTRACT)

    # Sketch60 → Cut-Extrude31 (cut)
    with BuildSketch(Plane.XY.offset(48.4)):
        with Locations((0, -3)):
            Rectangle(SKETCH60_W, SKETCH60_H)
    extrude(amount=-CUT_EXTRUDE31_DEPTH, mode=Mode.SUBTRACT)

    # Sketch62 → Boss-Extrude20 (add)
    with BuildSketch(Plane.XZ):
        Polygon((-41.6, 48.4), (-41.6, 41.6), (-46.8, 41.6), (-46.8, -41.6), (-41.6, -41.6), (-41.6, -48.4), (41.6, -48.4), (41.6, -41.6), (46.8, -41.6), (46.8, 41.6), (41.6, 41.6), (41.6, 48.4), align=None)
        Polygon((-40.1, 46.9), (-40.1, 40.1), (-45.3, 40.1), (-45.3, -40.1), (-40.1, -40.1), (-40.1, -46.9), (40.1, -46.9), (40.1, -40.1), (41.6, -40.1), (45.3, -40.1), (45.3, 40.1), (40.1, 40.1), (40.1, 46.9), align=None, mode=Mode.SUBTRACT)
    extrude(amount=BOSS_EXTRUDE20_DEPTH)

    # Sketch64 → Cut-Extrude32 (cut)
    with BuildSketch(Plane.XY.offset(48.4)):
        with Locations((-24.65, -5)):
            Rectangle(SKETCH64_W, SKETCH64_H)
    extrude(amount=-CUT_EXTRUDE32_DEPTH, mode=Mode.SUBTRACT)

    # Sketch65 → Cut-Extrude33 (cut)
    with BuildSketch(Plane.XY.offset(48.4)):
        with Locations((24.65, -5)):
            Rectangle(SKETCH65_W, SKETCH65_H)
    extrude(amount=-CUT_EXTRUDE33_DEPTH, mode=Mode.SUBTRACT)

    # Sketch66 → Cut-Extrude34 (cut)
    with BuildSketch(Plane(origin=(46.8, 0, 0), x_dir=(0, 0, -1), z_dir=(1, 0, 0))):
        with Locations((-22.8, -5)):
            Rectangle(SKETCH66_W, SKETCH66_H)
    extrude(amount=-CUT_EXTRUDE34_DEPTH, mode=Mode.SUBTRACT)

    # Sketch68 → Cut-Extrude35 (cut)
    with BuildSketch(Plane(origin=(46.8, 0, 0), x_dir=(0, 0, -1), z_dir=(1, 0, 0))):
        with Locations((22.8, -5)):
            Rectangle(SKETCH68_W, SKETCH68_H)
    extrude(amount=-CUT_EXTRUDE35_DEPTH, mode=Mode.SUBTRACT)

    # Fillet19
    fillet19_edges = [part.edges().sort_by_distance(p)[0] for p in [
        (-4, -2, -47.65),
        (-4, -2, 47.65),
        (4, -2, 47.65),
        (4, -2, -47.65),
        (-46.05, -2, 4),
        (46.05, -2, 4),
        (-46.05, -2, -4),
        (46.05, -2, -4),
    ]]
    fillet(fillet19_edges, radius=FILLET19_R)

    # Sketch73 → Boss-Extrude21 (add)
    with BuildSketch(Plane(origin=(-45.3, 0, 0), x_dir=(0, 0, -1), z_dir=(1, 0, 0))):
        with Locations((0, -2.4)):
            Circle(SKETCH73_R)
    extrude(amount=BOSS_EXTRUDE21_DEPTH)

    # Sketch74 → Boss-Extrude22 (add)
    with BuildSketch(Plane.XY.offset(-46.9)):
        with Locations((0, -2.4)):
            Circle(SKETCH74_R)
    extrude(amount=BOSS_EXTRUDE22_DEPTH)

    # Sketch75 → Boss-Extrude23 (add)
    with BuildSketch(Plane(origin=(0, 0, 46.9), x_dir=(-1, 0, 0), z_dir=(0, 0, -1)).offset(BOSS_EXTRUDE23_START)):
        with Locations((0, -2.4)):
            Circle(SKETCH75_R)
    extrude(amount=-BOSS_EXTRUDE23_DEPTH)

    # Sketch76 → Boss-Extrude24 (add)
    with BuildSketch(Plane.ZY.offset(-45.3)):
        with Locations((0, -2.25000044)):
            Circle(SKETCH76_R)
    extrude(amount=BOSS_EXTRUDE24_DEPTH)

    # Sketch77 → Cut-Extrude40 (cut)
    with BuildSketch(Plane.XY.offset(48.4)):
        with Locations((0, -7.2)):
            Rectangle(SKETCH77_W, SKETCH77_H)
    extrude(amount=-CUT_EXTRUDE40_DEPTH, mode=Mode.SUBTRACT)

    # Sketch79 → Cut-Extrude41 (cut)
    with BuildSketch(Plane(origin=(46.8, 0, 0), x_dir=(0, 0, -1), z_dir=(1, 0, 0))):
        with Locations((0, -7.2)):
            Rectangle(SKETCH79_W, SKETCH79_H)
    extrude(amount=-CUT_EXTRUDE41_DEPTH, mode=Mode.SUBTRACT)

    # Fillet20
    fillet20_edges = [part.edges().sort_by_distance(p)[0] for p in [
        (-46.05, -6.4, 4),
        (-46.05, -6.4, -4),
        (-4, -6.4, -47.65),
        (4, -6.4, -47.65),
        (-4, -6.4, 47.65),
        (4, -6.4, 47.65),
        (46.05, -6.4, 4),
        (46.05, -6.4, -4),
    ]]
    fillet(fillet20_edges, radius=FILLET20_R)

    # M3x0.5 Tapped Hole4
    with Locations(Plane.XY.offset(48.4)):
        with Locations((0, -2.4)):
            Hole(M3X0_5_TAPPED_HOLE4_D / 2, depth=M3X0_5_TAPPED_HOLE4_DEPTH)
            with Locations((0, 0, -(M3X0_5_TAPPED_HOLE4_DEPTH + M3X0_5_TAPPED_HOLE4_TIP / 2))):  # 118° drill point
                Cone(0, M3X0_5_TAPPED_HOLE4_D / 2, M3X0_5_TAPPED_HOLE4_TIP, mode=Mode.SUBTRACT)

    # M3x0.5 Tapped Hole5
    with Locations(Plane(origin=(46.8, 0, 0), x_dir=(0, 0, -1), z_dir=(1, 0, 0))):
        with Locations((0, -2.4)):
            Hole(M3X0_5_TAPPED_HOLE5_D / 2, depth=M3X0_5_TAPPED_HOLE5_DEPTH)
            with Locations((0, 0, -(M3X0_5_TAPPED_HOLE5_DEPTH + M3X0_5_TAPPED_HOLE5_TIP / 2))):  # 118° drill point
                Cone(0, M3X0_5_TAPPED_HOLE5_D / 2, M3X0_5_TAPPED_HOLE5_TIP, mode=Mode.SUBTRACT)

    # M3x0.5 Tapped Hole6
    with Locations(Plane(origin=(0, 0, -48.4), x_dir=(-1, 0, 0), z_dir=(0, 0, -1))):
        with Locations((0, -2.4)):
            Hole(M3X0_5_TAPPED_HOLE6_D / 2, depth=M3X0_5_TAPPED_HOLE6_DEPTH)
            with Locations((0, 0, -(M3X0_5_TAPPED_HOLE6_DEPTH + M3X0_5_TAPPED_HOLE6_TIP / 2))):  # 118° drill point
                Cone(0, M3X0_5_TAPPED_HOLE6_D / 2, M3X0_5_TAPPED_HOLE6_TIP, mode=Mode.SUBTRACT)

    # M3x0.5 Tapped Hole7
    with Locations(Plane.ZY.offset(46.8)):
        with Locations((0, -2.4)):
            Hole(M3X0_5_TAPPED_HOLE7_D / 2, depth=M3X0_5_TAPPED_HOLE7_DEPTH)
            with Locations((0, 0, -(M3X0_5_TAPPED_HOLE7_DEPTH + M3X0_5_TAPPED_HOLE7_TIP / 2))):  # 118° drill point
                Cone(0, M3X0_5_TAPPED_HOLE7_D / 2, M3X0_5_TAPPED_HOLE7_TIP, mode=Mode.SUBTRACT)

    # Sketch88 → Boss-Extrude25 (add)
    with BuildSketch(Plane(origin=(0, 1.6, 0), x_dir=(1, 0, 0), z_dir=(0, 1, 0))):
        Rectangle(SKETCH88_W, SKETCH88_H)
    extrude(amount=-BOSS_EXTRUDE25_DEPTH)


solid = part.part
